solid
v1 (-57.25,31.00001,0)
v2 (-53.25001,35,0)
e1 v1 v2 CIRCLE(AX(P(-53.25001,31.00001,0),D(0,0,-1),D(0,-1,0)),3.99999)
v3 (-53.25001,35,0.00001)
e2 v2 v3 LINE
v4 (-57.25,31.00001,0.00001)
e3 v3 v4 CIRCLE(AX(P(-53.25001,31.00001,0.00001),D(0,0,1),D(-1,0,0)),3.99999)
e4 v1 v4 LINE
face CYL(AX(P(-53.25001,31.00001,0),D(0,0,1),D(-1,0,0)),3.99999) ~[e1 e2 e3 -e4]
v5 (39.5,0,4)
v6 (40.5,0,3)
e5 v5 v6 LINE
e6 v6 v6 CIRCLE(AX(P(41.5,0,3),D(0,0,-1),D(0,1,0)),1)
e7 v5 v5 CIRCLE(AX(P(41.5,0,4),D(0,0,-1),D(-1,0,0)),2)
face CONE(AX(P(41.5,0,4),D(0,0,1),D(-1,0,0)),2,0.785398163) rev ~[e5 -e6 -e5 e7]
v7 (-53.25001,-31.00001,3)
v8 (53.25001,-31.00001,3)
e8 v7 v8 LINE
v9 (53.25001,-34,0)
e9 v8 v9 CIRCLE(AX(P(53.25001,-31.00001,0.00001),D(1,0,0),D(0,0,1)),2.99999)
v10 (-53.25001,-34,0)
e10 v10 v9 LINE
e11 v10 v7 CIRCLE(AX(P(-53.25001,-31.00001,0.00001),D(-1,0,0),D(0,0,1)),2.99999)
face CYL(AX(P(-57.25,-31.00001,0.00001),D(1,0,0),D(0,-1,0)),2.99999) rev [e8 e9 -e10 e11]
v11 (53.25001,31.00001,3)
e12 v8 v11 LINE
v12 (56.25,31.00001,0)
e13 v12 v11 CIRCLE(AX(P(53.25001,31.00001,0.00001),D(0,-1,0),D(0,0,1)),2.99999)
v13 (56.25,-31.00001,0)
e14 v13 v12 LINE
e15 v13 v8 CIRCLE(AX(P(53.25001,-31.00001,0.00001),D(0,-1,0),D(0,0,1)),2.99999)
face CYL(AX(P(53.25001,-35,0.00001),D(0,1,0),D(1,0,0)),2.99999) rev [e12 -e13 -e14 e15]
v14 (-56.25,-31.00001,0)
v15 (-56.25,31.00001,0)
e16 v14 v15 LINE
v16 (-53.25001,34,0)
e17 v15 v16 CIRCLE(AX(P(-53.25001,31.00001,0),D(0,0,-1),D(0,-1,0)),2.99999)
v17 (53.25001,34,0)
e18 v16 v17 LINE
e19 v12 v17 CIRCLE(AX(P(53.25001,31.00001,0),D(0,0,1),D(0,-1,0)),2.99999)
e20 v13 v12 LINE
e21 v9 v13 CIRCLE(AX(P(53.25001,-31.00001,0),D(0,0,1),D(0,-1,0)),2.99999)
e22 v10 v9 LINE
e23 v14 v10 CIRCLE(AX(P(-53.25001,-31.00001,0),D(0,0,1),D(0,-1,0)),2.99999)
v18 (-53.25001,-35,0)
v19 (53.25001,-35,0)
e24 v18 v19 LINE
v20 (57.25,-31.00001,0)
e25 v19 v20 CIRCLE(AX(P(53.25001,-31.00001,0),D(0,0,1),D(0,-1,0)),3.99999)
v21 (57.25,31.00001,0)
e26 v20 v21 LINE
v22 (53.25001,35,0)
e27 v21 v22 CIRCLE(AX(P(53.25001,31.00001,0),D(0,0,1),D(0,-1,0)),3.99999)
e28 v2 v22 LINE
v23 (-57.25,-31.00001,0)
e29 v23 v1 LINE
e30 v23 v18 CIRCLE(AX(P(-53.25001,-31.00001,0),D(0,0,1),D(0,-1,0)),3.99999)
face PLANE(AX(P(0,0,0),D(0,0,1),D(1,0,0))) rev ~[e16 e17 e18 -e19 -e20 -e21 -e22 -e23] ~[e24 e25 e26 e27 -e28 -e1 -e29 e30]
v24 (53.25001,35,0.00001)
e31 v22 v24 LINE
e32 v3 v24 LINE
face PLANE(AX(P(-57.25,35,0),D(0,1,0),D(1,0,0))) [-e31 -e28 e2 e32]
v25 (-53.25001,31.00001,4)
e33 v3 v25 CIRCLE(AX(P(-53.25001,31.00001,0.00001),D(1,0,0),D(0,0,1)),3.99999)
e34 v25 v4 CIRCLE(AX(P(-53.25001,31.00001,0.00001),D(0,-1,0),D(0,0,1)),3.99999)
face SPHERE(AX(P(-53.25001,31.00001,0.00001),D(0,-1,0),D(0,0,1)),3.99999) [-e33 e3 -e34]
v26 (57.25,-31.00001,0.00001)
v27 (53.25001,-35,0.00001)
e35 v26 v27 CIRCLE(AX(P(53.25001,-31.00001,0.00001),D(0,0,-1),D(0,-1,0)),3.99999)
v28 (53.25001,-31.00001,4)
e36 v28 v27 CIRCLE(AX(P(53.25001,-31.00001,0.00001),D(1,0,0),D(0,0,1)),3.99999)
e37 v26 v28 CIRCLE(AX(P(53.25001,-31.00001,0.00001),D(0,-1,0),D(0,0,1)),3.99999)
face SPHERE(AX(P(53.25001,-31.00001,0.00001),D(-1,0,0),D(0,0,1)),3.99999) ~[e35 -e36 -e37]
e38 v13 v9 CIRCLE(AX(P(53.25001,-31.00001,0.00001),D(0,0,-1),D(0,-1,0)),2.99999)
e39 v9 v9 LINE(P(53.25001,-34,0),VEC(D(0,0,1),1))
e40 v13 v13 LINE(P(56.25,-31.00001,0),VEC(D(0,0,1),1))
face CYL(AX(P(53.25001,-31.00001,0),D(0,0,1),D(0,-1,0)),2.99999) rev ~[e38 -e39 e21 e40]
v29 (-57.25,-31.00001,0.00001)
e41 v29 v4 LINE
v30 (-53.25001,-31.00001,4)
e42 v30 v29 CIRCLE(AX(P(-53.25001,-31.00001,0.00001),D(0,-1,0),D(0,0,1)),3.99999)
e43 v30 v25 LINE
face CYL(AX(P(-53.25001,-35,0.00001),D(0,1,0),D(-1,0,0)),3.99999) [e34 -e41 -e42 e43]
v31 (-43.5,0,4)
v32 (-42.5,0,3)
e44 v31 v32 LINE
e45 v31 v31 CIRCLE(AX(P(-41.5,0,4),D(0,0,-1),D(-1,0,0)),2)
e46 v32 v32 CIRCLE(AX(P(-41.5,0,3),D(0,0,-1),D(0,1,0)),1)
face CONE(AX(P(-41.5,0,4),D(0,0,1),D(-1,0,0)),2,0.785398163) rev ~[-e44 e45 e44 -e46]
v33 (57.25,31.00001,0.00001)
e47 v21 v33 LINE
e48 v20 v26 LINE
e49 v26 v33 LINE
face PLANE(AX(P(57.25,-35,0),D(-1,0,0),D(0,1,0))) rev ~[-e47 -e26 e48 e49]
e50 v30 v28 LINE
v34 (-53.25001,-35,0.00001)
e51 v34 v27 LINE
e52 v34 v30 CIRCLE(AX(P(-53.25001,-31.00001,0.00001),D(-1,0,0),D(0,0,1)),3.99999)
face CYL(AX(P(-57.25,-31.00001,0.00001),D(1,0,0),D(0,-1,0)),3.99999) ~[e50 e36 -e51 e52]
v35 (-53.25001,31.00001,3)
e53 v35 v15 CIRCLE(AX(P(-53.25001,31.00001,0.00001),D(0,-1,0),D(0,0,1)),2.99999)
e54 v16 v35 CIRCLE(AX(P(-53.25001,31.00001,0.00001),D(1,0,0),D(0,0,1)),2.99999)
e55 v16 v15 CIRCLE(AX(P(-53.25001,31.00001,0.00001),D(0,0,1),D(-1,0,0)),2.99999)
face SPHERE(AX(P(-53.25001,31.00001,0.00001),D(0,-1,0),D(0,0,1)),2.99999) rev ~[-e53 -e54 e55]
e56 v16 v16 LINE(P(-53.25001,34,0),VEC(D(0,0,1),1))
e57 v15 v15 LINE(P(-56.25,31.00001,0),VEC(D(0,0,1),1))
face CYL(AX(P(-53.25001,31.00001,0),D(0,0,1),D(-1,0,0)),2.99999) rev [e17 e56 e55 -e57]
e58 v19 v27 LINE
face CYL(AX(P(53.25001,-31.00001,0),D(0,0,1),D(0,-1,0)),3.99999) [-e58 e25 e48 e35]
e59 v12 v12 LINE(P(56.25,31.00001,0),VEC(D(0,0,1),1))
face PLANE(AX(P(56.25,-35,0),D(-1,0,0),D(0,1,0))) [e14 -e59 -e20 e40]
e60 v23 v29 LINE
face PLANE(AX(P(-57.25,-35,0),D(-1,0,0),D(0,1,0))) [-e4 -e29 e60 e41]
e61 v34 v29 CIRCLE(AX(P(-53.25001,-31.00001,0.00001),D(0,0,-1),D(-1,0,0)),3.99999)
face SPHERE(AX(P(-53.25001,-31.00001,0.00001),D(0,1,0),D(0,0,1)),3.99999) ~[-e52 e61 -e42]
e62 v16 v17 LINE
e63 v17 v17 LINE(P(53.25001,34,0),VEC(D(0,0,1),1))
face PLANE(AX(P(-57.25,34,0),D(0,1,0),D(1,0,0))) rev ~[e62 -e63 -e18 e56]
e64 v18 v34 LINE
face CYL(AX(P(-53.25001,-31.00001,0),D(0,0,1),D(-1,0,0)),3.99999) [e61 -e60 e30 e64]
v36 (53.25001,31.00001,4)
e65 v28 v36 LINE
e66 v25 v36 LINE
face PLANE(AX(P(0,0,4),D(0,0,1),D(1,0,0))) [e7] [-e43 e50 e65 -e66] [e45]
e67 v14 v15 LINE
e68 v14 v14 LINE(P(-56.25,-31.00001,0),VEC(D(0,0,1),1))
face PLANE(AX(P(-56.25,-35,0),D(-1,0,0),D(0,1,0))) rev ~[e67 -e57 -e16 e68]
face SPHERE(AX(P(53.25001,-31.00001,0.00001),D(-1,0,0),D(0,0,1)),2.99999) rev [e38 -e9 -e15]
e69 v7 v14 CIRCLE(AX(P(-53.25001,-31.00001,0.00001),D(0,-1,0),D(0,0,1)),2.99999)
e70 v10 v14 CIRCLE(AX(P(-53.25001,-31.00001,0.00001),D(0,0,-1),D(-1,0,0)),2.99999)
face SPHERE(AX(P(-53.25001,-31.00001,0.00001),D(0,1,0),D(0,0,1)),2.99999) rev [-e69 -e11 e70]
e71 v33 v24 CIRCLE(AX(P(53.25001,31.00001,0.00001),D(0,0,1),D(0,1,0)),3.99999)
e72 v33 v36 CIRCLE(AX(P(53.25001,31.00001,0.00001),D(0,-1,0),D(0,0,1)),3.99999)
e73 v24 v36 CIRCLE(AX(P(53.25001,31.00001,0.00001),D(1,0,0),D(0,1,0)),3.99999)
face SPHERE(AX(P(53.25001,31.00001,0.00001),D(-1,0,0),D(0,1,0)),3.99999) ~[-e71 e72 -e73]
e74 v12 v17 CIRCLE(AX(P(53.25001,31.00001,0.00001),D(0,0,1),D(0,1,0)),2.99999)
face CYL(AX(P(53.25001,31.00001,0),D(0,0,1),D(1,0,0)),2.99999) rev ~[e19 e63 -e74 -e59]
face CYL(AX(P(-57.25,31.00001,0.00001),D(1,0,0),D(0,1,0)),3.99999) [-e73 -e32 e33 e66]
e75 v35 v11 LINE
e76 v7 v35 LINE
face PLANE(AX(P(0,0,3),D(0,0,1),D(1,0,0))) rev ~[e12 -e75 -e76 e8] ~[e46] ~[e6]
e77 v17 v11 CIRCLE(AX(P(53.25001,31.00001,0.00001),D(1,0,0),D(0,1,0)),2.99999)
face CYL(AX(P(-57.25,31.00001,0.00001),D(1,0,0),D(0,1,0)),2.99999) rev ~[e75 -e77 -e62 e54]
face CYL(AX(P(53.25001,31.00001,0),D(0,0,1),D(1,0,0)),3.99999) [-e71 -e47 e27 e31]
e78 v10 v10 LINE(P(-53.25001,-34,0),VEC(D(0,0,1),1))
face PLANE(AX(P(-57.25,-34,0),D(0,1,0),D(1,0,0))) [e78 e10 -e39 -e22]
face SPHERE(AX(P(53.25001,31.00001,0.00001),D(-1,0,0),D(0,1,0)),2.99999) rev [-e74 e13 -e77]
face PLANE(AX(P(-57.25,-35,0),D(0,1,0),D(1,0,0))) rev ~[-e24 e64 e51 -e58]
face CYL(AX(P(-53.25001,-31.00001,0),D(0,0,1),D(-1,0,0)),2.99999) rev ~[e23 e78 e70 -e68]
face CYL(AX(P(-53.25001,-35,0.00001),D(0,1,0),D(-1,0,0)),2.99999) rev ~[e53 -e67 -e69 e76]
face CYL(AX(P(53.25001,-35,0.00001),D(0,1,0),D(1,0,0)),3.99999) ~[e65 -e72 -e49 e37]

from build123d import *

# Parameters (mm, degrees)
F0_W           = 114.5
F0_H           = 70
F1_DEPTH       = 4
F2_R           = 3.99999
F3_T           = -1
F5_D           = 2
F5_CSINK_D     = 4
F5_CSINK_ANGLE = 90


# Not quite as in the source:
# - a fillet or chamfer is up to 0.001 mm smaller than in the source, because OpenCascade refuses the exact size


with BuildPart() as f1:
    # F0 (on Top) → F1 (new body)
    with BuildSketch(Plane.XY):
        Rectangle(F0_W, F0_H)
    extrude(amount=F1_DEPTH)

    # F2 (radius 4 in the source; OpenCascade refuses exactly that, so slightly less here)
    f2_edges = [f1.edges().sort_by_distance(p)[0] for p in [
        (-57.25, 0, 4),
        (0, 35, 4),
        (0, -35, 4),
        (-57.25, -35, 2),
        (-57.25, 35, 2),
        (57.25, 35, 2),
        (57.25, 0, 4),
        (57.25, -35, 2),
    ]]
    fillet(f2_edges, radius=F2_R)

    # F3
    f3_openings = [f1.faces().sort_by_distance(p)[0] for p in [
        (0, 0, 0),
    ]]
    offset(amount=F3_T, openings=f3_openings)

    # F5 (through all)
    with Locations(Plane.XY.offset(4)):
        with Locations((41.5, 0), (-41.5, 0)):
            CounterSinkHole(F5_D / 2, F5_CSINK_D / 2, counter_sink_angle=F5_CSINK_ANGLE)


solid = f1.part
